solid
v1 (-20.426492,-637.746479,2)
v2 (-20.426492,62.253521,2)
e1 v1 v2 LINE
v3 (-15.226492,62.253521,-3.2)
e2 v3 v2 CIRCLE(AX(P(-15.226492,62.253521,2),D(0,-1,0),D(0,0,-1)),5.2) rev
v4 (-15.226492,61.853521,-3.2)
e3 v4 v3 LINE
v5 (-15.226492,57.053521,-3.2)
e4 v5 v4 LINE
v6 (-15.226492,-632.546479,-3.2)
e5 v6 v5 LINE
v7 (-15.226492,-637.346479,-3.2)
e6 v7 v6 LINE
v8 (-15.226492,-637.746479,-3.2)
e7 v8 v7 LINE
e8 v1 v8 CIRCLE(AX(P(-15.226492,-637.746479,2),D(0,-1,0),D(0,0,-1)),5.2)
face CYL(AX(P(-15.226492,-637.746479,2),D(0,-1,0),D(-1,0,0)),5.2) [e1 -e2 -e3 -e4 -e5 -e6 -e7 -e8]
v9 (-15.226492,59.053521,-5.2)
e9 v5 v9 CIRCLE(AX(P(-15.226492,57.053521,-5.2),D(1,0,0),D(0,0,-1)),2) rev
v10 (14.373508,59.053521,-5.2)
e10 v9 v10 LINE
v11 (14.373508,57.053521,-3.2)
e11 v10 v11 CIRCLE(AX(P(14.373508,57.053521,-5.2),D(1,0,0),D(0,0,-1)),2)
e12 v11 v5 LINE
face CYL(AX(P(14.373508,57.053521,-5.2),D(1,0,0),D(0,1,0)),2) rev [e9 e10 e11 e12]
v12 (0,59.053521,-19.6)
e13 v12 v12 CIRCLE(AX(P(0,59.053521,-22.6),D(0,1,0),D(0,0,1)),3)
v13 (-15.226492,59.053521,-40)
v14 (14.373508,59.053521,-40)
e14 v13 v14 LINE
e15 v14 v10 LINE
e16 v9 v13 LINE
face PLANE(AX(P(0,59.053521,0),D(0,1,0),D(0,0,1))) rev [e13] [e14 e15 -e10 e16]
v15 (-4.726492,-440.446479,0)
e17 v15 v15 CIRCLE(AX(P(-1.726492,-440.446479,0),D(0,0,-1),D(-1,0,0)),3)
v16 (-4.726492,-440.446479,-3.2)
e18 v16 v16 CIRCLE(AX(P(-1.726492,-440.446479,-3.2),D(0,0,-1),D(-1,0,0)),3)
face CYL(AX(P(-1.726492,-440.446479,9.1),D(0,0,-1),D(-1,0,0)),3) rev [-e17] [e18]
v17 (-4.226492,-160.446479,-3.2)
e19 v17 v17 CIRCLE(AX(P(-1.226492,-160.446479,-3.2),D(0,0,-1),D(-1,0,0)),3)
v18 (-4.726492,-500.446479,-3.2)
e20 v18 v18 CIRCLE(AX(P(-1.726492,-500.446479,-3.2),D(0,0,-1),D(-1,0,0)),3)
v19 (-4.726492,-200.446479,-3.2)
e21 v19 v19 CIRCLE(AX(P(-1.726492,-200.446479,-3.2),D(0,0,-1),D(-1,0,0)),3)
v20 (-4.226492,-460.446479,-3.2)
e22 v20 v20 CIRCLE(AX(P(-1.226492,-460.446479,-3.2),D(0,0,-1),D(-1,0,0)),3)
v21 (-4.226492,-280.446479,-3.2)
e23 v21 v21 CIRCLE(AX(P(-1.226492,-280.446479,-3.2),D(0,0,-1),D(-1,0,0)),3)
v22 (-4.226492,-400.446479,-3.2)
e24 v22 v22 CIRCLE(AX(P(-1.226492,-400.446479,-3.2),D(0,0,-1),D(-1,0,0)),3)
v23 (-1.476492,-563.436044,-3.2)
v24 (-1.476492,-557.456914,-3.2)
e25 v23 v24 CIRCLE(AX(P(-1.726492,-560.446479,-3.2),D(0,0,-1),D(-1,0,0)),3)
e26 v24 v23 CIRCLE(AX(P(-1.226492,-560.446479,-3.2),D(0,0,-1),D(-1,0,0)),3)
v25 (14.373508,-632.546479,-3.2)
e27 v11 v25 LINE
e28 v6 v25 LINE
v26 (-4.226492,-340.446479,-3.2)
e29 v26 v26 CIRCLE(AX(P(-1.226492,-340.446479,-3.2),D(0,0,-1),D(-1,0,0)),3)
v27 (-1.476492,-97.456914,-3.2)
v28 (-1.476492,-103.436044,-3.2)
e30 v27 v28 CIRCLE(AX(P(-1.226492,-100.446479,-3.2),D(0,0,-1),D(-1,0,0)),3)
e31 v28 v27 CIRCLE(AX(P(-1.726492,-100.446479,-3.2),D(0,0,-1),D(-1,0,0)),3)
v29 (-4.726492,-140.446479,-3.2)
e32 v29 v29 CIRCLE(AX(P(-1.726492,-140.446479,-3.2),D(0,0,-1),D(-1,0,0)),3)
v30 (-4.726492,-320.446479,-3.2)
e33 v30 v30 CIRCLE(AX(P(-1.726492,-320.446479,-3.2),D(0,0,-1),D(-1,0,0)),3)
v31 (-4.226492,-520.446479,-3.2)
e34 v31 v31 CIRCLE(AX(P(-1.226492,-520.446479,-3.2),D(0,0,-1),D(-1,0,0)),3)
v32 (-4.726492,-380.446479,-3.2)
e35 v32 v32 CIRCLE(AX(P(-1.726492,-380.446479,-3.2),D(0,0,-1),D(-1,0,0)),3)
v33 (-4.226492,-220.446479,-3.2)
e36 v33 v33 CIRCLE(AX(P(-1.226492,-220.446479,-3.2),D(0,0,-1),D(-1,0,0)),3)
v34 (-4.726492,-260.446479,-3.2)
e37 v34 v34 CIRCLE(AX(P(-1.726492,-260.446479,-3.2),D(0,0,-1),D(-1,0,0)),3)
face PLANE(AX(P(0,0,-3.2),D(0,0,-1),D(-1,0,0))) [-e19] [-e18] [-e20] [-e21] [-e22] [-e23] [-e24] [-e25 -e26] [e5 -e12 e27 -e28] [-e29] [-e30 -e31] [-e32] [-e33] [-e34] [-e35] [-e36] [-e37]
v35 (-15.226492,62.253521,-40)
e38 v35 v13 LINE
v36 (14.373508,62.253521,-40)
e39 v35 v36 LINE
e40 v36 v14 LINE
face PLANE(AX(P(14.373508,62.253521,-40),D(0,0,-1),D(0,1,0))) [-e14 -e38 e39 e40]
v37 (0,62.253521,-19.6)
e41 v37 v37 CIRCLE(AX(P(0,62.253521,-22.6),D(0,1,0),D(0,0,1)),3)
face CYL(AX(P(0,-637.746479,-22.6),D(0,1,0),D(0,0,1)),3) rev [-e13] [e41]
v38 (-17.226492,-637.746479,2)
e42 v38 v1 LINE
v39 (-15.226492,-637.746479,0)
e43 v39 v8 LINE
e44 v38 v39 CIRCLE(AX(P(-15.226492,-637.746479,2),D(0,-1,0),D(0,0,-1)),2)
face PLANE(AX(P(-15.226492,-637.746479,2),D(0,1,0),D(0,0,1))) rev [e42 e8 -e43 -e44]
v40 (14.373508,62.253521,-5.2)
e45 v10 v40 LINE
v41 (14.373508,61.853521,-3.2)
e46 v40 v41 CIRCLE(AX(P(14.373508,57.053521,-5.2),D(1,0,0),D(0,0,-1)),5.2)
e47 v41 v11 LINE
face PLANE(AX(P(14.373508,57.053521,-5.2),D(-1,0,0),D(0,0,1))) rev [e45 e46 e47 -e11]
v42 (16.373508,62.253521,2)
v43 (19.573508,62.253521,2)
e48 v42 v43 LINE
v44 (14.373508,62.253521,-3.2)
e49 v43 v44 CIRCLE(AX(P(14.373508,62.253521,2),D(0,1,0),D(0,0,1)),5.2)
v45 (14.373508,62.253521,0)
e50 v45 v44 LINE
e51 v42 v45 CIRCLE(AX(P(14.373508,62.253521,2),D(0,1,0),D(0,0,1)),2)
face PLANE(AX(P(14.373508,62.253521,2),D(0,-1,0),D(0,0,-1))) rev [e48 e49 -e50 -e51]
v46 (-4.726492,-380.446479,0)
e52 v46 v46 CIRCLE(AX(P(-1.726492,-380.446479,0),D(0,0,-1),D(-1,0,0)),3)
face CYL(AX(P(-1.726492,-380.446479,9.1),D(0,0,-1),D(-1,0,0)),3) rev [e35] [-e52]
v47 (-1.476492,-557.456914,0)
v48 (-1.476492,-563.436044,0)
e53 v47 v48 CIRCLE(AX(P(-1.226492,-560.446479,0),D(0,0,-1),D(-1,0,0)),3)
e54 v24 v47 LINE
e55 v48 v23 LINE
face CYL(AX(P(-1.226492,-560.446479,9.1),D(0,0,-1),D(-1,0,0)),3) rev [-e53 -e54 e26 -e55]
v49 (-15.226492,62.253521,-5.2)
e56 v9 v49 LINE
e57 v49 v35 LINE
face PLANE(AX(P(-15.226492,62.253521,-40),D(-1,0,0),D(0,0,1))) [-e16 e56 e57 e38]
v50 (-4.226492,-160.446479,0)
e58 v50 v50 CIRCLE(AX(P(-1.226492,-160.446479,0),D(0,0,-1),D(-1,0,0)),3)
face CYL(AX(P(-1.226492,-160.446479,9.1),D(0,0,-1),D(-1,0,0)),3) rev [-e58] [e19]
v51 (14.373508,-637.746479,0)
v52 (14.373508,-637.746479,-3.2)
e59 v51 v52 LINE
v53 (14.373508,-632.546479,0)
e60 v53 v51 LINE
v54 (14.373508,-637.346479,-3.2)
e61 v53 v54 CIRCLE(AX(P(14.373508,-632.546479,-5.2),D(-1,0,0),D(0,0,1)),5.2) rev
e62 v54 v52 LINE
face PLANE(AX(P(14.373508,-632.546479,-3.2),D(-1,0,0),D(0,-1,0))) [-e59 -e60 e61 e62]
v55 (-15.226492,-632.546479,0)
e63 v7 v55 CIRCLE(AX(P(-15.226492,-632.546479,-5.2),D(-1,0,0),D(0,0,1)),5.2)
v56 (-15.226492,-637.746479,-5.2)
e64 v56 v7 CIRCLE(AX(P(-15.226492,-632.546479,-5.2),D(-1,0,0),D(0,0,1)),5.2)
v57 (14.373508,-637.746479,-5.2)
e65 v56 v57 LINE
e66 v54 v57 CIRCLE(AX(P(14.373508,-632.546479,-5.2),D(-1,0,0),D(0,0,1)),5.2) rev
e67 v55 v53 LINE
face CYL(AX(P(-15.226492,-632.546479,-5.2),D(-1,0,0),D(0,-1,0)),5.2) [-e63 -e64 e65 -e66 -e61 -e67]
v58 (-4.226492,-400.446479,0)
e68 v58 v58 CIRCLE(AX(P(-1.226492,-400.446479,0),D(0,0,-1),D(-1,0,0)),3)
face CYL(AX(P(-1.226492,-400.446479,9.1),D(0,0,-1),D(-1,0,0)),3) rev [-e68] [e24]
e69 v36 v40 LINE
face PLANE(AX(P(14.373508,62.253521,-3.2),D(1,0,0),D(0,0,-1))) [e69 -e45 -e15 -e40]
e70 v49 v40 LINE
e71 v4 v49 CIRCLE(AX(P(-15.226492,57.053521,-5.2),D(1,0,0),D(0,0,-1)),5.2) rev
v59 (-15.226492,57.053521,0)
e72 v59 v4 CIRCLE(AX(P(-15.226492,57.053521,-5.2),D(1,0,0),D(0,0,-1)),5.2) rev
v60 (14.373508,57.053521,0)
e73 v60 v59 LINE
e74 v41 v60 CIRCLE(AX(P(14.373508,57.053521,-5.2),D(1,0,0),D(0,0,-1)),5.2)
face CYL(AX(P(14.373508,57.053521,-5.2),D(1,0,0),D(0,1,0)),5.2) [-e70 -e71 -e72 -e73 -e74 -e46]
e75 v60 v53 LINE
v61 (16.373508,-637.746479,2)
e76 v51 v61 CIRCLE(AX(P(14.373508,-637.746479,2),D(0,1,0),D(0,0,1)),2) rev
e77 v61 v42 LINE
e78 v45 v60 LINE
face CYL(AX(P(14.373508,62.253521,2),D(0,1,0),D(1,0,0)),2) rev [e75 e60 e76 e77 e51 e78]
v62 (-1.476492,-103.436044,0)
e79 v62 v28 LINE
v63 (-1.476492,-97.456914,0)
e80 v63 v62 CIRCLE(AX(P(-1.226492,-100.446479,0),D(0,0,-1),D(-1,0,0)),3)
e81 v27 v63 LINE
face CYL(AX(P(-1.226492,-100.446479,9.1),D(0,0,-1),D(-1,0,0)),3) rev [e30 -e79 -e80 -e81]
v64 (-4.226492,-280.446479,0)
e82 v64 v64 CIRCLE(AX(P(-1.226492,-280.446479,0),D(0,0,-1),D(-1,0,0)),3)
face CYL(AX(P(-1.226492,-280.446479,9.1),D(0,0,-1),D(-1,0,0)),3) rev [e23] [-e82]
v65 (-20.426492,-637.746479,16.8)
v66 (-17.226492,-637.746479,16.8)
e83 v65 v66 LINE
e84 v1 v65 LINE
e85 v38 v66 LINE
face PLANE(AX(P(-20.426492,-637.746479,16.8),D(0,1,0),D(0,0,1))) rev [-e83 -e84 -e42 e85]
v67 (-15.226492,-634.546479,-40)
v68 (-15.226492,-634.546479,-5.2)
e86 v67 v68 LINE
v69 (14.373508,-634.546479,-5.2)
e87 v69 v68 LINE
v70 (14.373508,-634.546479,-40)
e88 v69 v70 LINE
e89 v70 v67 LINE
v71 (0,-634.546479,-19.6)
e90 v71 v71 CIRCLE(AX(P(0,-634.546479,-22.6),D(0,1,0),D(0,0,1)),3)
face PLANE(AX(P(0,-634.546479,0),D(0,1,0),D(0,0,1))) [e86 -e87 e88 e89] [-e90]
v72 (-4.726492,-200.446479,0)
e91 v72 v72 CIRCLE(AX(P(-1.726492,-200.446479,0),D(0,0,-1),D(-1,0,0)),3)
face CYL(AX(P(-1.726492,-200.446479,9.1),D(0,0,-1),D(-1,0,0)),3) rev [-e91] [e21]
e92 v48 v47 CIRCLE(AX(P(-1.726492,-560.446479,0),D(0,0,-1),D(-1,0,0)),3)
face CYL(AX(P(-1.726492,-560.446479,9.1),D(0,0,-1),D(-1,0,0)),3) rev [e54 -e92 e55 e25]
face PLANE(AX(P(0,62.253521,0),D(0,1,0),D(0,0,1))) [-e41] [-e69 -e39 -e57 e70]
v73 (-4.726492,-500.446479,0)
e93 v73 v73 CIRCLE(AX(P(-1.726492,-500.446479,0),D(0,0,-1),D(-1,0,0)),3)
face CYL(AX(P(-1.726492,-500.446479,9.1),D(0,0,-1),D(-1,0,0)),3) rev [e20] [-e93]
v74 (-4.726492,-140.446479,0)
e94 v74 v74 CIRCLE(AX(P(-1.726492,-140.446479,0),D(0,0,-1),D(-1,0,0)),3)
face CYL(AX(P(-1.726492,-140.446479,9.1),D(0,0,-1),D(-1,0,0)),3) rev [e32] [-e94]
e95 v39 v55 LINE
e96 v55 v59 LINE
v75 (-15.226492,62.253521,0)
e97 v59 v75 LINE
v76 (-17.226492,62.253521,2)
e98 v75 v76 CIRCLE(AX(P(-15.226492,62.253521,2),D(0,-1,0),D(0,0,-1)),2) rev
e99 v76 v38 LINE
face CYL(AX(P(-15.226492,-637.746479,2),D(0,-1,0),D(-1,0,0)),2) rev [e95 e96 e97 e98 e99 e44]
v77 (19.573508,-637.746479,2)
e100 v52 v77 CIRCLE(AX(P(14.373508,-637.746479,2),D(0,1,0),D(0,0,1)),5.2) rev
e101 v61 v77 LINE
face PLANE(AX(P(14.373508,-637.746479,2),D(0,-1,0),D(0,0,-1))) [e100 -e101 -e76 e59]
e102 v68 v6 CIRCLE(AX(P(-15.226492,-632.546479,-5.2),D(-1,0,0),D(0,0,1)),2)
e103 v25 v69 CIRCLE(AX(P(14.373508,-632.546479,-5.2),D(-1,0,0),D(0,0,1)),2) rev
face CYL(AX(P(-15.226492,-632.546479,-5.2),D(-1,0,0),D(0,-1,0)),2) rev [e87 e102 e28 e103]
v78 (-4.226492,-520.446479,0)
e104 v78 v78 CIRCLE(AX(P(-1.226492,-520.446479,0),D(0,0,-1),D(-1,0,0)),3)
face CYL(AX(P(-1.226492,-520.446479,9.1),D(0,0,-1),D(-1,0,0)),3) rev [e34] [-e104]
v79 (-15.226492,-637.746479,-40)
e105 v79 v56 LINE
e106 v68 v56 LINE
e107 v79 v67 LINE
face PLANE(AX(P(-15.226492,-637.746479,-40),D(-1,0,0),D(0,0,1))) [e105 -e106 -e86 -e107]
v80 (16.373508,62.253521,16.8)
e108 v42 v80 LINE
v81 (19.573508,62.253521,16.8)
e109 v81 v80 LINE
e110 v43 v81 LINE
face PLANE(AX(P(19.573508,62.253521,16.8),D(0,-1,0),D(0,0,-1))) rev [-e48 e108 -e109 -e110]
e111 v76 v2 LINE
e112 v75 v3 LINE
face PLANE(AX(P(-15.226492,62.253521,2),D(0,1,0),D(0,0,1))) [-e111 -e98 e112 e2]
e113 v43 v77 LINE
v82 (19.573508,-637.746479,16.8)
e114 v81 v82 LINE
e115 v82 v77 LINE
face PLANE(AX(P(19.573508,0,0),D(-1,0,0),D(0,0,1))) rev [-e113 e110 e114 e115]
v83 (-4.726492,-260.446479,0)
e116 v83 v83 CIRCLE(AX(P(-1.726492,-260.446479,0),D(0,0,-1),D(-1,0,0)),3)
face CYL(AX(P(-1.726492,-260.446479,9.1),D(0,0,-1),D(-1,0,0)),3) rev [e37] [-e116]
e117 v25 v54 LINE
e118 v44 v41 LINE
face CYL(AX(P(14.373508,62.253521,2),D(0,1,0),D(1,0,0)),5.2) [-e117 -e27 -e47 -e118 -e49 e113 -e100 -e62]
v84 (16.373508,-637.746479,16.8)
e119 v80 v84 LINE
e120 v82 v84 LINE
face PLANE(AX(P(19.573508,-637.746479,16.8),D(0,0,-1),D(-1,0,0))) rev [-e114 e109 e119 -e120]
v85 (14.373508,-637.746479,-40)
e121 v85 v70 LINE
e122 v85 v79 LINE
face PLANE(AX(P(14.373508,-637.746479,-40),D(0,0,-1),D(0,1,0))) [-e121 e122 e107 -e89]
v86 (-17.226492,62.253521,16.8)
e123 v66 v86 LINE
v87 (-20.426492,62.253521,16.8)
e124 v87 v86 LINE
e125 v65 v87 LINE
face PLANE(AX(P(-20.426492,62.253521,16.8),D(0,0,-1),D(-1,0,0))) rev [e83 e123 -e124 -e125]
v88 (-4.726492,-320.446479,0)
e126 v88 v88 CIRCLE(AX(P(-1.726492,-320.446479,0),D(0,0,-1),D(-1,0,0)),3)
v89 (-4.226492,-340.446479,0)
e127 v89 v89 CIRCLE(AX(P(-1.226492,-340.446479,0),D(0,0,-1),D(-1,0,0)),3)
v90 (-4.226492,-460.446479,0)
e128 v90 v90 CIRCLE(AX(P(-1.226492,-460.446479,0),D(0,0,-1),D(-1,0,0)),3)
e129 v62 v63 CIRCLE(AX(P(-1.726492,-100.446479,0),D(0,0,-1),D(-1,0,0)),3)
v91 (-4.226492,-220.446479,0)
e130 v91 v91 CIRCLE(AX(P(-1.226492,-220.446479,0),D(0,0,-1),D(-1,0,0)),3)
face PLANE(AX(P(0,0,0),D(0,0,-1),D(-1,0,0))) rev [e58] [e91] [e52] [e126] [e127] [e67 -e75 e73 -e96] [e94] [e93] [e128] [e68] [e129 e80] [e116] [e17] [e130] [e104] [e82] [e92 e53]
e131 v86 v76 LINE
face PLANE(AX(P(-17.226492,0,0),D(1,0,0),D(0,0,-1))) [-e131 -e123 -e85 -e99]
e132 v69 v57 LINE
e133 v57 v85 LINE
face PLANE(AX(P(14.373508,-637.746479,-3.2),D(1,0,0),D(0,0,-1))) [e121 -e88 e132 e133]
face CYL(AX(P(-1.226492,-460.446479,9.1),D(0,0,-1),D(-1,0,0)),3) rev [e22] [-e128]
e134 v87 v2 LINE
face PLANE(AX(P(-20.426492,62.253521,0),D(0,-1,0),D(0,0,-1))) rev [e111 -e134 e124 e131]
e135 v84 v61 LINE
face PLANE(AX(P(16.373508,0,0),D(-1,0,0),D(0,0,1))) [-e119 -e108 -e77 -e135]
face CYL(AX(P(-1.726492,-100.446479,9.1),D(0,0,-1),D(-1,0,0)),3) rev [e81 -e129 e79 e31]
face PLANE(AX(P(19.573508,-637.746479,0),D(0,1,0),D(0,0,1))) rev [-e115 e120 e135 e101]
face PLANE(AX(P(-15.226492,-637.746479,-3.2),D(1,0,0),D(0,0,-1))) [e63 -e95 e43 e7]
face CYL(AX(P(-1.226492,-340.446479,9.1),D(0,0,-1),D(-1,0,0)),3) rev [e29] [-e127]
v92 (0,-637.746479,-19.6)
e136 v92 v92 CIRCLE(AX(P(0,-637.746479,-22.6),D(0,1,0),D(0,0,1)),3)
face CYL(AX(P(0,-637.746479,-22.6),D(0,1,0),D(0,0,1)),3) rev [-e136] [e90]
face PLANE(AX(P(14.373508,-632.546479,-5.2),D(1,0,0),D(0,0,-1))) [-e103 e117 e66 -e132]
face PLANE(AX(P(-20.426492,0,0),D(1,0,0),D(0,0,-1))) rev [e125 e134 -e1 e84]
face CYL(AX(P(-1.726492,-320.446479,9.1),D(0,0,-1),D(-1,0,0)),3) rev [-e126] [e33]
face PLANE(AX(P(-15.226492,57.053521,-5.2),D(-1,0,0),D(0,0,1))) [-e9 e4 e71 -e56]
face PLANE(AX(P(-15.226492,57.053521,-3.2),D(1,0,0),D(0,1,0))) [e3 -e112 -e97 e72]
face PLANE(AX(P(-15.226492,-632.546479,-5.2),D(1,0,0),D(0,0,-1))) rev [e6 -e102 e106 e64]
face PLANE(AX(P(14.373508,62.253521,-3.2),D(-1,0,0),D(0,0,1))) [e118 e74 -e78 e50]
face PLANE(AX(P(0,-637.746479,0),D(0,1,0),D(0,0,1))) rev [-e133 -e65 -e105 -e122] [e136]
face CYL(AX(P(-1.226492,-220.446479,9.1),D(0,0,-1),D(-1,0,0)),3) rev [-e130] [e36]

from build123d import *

# Parameters (mm, degrees)
SKETCH1_W                      = 40
SKETCH1_H                      = 700
BASE_FLANGE1_DEPTH             = 3.2
EDGE_FLANGE1_STRIP_W           = 16.8
EDGE_FLANGE1_STRIP_H           = 3.2
EDGE_FLANGE1_STRIP_CUT_DEPTH   = 700
EDGE_FLANGE1_STRIP_2_W         = 16.8
EDGE_FLANGE1_STRIP_2_H         = 3.2
EDGE_FLANGE1_STRIP_CUT_2_DEPTH = 700
EDGE_FLANGE1_DEPTH             = 700
EDGE_FLANGE1_BEND_DEPTH        = 700
EDGE_FLANGE2_STRIP_W           = 16.8
EDGE_FLANGE2_STRIP_H           = 3.2
EDGE_FLANGE2_STRIP_CUT_DEPTH   = 29.6
EDGE_FLANGE2_STRIP_2_W         = 16.8
EDGE_FLANGE2_STRIP_2_H         = 3.2
EDGE_FLANGE2_STRIP_CUT_2_DEPTH = 29.6
EDGE_FLANGE2_DEPTH             = 29.6
EDGE_FLANGE2_BEND_DEPTH        = 29.6
SKETCH18_R                     = 3
CUT_EXTRUDE1_DEPTH             = 702.43940692
SKETCH29_R                     = 3
CUT_EXTRUDE12_DEPTH            = 15
CUT_EXTRUDE13_START            = -5.9
CUT_EXTRUDE13_OUTLINE_R        = 3
CUT_EXTRUDE13_DEPTH            = 3.2


# Read off the part's stored shape, not the designer's step: Cut-Extrude13
# Sheet-metal steps are written as plain solids
with BuildPart() as part:
    # Sketch1 → Base-Flange1 (new body)
    with BuildSketch(Plane.XY):
        with Locations((-0.426492134, -287.746478873)):
            Rectangle(SKETCH1_W, SKETCH1_H)
    extrude(amount=-BASE_FLANGE1_DEPTH)

    # Edge-Flange1 strip (across the edge) → Edge-Flange1 strip cut (cut)
    with BuildSketch(Plane(origin=(-20.426492134, 62.253521127, 0), x_dir=(1, 0, 0), z_dir=(0, -1, 0))):
        with Locations((-3.2, -1.6)):
            Rectangle(EDGE_FLANGE1_STRIP_W, EDGE_FLANGE1_STRIP_H)
    extrude(amount=EDGE_FLANGE1_STRIP_CUT_DEPTH, mode=Mode.SUBTRACT)

    # Edge-Flange1 strip 2 (across the edge) → Edge-Flange1 strip cut 2 (cut)
    with BuildSketch(Plane(origin=(19.573507866, -637.746478873, 0), x_dir=(-1, 0, 0), z_dir=(0, 1, 0))):
        with Locations((-3.2, -1.6)):
            Rectangle(EDGE_FLANGE1_STRIP_2_W, EDGE_FLANGE1_STRIP_2_H)
    extrude(amount=EDGE_FLANGE1_STRIP_CUT_2_DEPTH, mode=Mode.SUBTRACT)

    # Edge-Flange1 section (across the edge) → Edge-Flange1 (add)
    with BuildSketch(Plane(origin=(-20.426492134, 62.253521127, 0), x_dir=(1, 0, 0), z_dir=(0, -1, 0))):
        with BuildLine():
            Line((0, 2), (0, 16.8))
            Line((0, 16.8), (3.2, 16.8))
            Line((3.2, 16.8), (3.2, 2))
            ThreePointArc((3.2, 2), (3.785786438, 0.585786438), (5.2, 0))
            Line((5.2, 0), (5.2, -3.2))
            ThreePointArc((5.2, -3.2), (1.523044738, -1.676955262), (0, 2))
        make_face()
    extrude(amount=EDGE_FLANGE1_DEPTH)

    # Edge-Flange1 section 2 (across the edge) → Edge-Flange1 bend (add)
    with BuildSketch(Plane(origin=(19.573507866, -637.746478873, 0), x_dir=(-1, 0, 0), z_dir=(0, 1, 0))):
        with BuildLine():
            Line((0, 2), (0, 16.8))
            Line((0, 16.8), (3.2, 16.8))
            Line((3.2, 16.8), (3.2, 2))
            ThreePointArc((3.2, 2), (3.785786438, 0.585786438), (5.2, 0))
            Line((5.2, 0), (5.2, -3.2))
            ThreePointArc((5.2, -3.2), (1.523044738, -1.676955262), (0, 2))
        make_face()
    extrude(amount=EDGE_FLANGE1_BEND_DEPTH)

    # Edge-Flange2 strip (across the edge) → Edge-Flange2 strip cut (cut)
    with BuildSketch(Plane(origin=(-15.226492134, 62.253521127, -3.2), x_dir=(0, -1, 0), z_dir=(1, 0, 0))):
        with Locations((-3.2, -1.6)):
            Rectangle(EDGE_FLANGE2_STRIP_W, EDGE_FLANGE2_STRIP_H)
    extrude(amount=EDGE_FLANGE2_STRIP_CUT_DEPTH, mode=Mode.SUBTRACT)

    # Edge-Flange2 strip 2 (across the edge) → Edge-Flange2 strip cut 2 (cut)
    with BuildSketch(Plane(origin=(14.373507866, -637.746478873, -3.2), x_dir=(0, 1, 0), z_dir=(-1, 0, 0))):
        with Locations((-3.2, -1.6)):
            Rectangle(EDGE_FLANGE2_STRIP_2_W, EDGE_FLANGE2_STRIP_2_H)
    extrude(amount=EDGE_FLANGE2_STRIP_CUT_2_DEPTH, mode=Mode.SUBTRACT)

    # Edge-Flange2 section (across the edge) → Edge-Flange2 (add)
    with BuildSketch(Plane(origin=(-15.226492134, 62.253521127, -3.2), x_dir=(0, -1, 0), z_dir=(1, 0, 0))):
        with BuildLine():
            Line((0, 2), (0, 36.8))
            Line((0, 36.8), (3.2, 36.8))
            Line((3.2, 36.8), (3.2, 2))
            ThreePointArc((3.2, 2), (3.785786438, 0.585786438), (5.2, 0))
            Line((5.2, 0), (5.2, -3.2))
            ThreePointArc((5.2, -3.2), (1.523044738, -1.676955262), (0, 2))
        make_face()
    extrude(amount=EDGE_FLANGE2_DEPTH)

    # Edge-Flange2 section 2 (across the edge) → Edge-Flange2 bend (add)
    with BuildSketch(Plane(origin=(14.373507866, -637.746478873, -3.2), x_dir=(0, 1, 0), z_dir=(-1, 0, 0))):
        with BuildLine():
            Line((0, 2), (0, 36.8))
            Line((0, 36.8), (3.2, 36.8))
            Line((3.2, 36.8), (3.2, 2))
            ThreePointArc((3.2, 2), (3.785786438, 0.585786438), (5.2, 0))
            Line((5.2, 0), (5.2, -3.2))
            ThreePointArc((5.2, -3.2), (1.523044738, -1.676955262), (0, 2))
        make_face()
    extrude(amount=EDGE_FLANGE2_BEND_DEPTH)

    # Sketch18 → Cut-Extrude1 (cut, through all)
    with BuildSketch(Plane(origin=(0, 62.253521127, 0), x_dir=(1, 0, 0), z_dir=(0, 1, 0))):
        with Locations(Location((0, 22.6, 0), (0, 0, 270))):
            Circle(SKETCH18_R)
    extrude(amount=-CUT_EXTRUDE1_DEPTH, mode=Mode.SUBTRACT)

    # Sketch29 → Cut-Extrude12 (cut)
    with BuildSketch(Plane(origin=(98.729905779, -312.144507489, -5.9), x_dir=(-1, 0, 0), z_dir=(0, 0, -1))):
        with Locations((100.456397914, 211.698028616)):
            Circle(SKETCH29_R)
        with Locations((100.456397914, 171.698028616)):
            Circle(SKETCH29_R)
        with Locations((100.456397914, 111.698028616)):
            Circle(SKETCH29_R)
        with Locations((100.456397914, 51.698028616)):
            Circle(SKETCH29_R)
        with Locations((100.456397914, -8.301971384)):
            Circle(SKETCH29_R)
        with Locations((100.456397914, -68.301971384)):
            Circle(SKETCH29_R)
        with Locations((100.456397914, -128.301971384)):
            Circle(SKETCH29_R)
        with Locations((100.456397914, -188.301971384)):
            Circle(SKETCH29_R)
        with Locations((100.456397914, -248.301971384)):
            Circle(SKETCH29_R)
    extrude(amount=-CUT_EXTRUDE12_DEPTH, mode=Mode.SUBTRACT)

    # Cut-Extrude13 outline → Cut-Extrude13 (cut)
    with BuildSketch(Plane(origin=(260.729905779, -312.144507489, -5.9), x_dir=(-1, 0, 0), z_dir=(0, 0, -1)).offset(CUT_EXTRUDE13_START)):
        with BuildLine():
            ThreePointArc((262.206397914, -251.29153657), (259.456397914, -248.301971384), (262.206397914, -245.312406198))
            ThreePointArc((262.206397914, -245.312406198), (258.956397914, -248.301971384), (262.206397914, -251.29153657))
        make_face()
        with BuildLine():
            ThreePointArc((262.206397914, 208.70846343), (259.456397914, 211.698028616), (262.206397914, 214.687593802))
            ThreePointArc((262.206397914, 214.687593802), (258.956397914, 211.698028616), (262.206397914, 208.70846343))
        make_face()
        with Locations((261.956397914, -208.301971384)):
            Circle(CUT_EXTRUDE13_OUTLINE_R)
        with Locations((261.956397914, -148.301971384)):
            Circle(CUT_EXTRUDE13_OUTLINE_R)
        with Locations((261.956397914, -88.301971384)):
            Circle(CUT_EXTRUDE13_OUTLINE_R)
        with Locations((261.956397914, -28.301971384)):
            Circle(CUT_EXTRUDE13_OUTLINE_R)
        with Locations((261.956397914, 31.698028616)):
            Circle(CUT_EXTRUDE13_OUTLINE_R)
        with Locations((261.956397914, 91.698028616)):
            Circle(CUT_EXTRUDE13_OUTLINE_R)
        with Locations((261.956397914, 151.698028616)):
            Circle(CUT_EXTRUDE13_OUTLINE_R)
    extrude(amount=CUT_EXTRUDE13_DEPTH, mode=Mode.SUBTRACT)


solid = part.part
